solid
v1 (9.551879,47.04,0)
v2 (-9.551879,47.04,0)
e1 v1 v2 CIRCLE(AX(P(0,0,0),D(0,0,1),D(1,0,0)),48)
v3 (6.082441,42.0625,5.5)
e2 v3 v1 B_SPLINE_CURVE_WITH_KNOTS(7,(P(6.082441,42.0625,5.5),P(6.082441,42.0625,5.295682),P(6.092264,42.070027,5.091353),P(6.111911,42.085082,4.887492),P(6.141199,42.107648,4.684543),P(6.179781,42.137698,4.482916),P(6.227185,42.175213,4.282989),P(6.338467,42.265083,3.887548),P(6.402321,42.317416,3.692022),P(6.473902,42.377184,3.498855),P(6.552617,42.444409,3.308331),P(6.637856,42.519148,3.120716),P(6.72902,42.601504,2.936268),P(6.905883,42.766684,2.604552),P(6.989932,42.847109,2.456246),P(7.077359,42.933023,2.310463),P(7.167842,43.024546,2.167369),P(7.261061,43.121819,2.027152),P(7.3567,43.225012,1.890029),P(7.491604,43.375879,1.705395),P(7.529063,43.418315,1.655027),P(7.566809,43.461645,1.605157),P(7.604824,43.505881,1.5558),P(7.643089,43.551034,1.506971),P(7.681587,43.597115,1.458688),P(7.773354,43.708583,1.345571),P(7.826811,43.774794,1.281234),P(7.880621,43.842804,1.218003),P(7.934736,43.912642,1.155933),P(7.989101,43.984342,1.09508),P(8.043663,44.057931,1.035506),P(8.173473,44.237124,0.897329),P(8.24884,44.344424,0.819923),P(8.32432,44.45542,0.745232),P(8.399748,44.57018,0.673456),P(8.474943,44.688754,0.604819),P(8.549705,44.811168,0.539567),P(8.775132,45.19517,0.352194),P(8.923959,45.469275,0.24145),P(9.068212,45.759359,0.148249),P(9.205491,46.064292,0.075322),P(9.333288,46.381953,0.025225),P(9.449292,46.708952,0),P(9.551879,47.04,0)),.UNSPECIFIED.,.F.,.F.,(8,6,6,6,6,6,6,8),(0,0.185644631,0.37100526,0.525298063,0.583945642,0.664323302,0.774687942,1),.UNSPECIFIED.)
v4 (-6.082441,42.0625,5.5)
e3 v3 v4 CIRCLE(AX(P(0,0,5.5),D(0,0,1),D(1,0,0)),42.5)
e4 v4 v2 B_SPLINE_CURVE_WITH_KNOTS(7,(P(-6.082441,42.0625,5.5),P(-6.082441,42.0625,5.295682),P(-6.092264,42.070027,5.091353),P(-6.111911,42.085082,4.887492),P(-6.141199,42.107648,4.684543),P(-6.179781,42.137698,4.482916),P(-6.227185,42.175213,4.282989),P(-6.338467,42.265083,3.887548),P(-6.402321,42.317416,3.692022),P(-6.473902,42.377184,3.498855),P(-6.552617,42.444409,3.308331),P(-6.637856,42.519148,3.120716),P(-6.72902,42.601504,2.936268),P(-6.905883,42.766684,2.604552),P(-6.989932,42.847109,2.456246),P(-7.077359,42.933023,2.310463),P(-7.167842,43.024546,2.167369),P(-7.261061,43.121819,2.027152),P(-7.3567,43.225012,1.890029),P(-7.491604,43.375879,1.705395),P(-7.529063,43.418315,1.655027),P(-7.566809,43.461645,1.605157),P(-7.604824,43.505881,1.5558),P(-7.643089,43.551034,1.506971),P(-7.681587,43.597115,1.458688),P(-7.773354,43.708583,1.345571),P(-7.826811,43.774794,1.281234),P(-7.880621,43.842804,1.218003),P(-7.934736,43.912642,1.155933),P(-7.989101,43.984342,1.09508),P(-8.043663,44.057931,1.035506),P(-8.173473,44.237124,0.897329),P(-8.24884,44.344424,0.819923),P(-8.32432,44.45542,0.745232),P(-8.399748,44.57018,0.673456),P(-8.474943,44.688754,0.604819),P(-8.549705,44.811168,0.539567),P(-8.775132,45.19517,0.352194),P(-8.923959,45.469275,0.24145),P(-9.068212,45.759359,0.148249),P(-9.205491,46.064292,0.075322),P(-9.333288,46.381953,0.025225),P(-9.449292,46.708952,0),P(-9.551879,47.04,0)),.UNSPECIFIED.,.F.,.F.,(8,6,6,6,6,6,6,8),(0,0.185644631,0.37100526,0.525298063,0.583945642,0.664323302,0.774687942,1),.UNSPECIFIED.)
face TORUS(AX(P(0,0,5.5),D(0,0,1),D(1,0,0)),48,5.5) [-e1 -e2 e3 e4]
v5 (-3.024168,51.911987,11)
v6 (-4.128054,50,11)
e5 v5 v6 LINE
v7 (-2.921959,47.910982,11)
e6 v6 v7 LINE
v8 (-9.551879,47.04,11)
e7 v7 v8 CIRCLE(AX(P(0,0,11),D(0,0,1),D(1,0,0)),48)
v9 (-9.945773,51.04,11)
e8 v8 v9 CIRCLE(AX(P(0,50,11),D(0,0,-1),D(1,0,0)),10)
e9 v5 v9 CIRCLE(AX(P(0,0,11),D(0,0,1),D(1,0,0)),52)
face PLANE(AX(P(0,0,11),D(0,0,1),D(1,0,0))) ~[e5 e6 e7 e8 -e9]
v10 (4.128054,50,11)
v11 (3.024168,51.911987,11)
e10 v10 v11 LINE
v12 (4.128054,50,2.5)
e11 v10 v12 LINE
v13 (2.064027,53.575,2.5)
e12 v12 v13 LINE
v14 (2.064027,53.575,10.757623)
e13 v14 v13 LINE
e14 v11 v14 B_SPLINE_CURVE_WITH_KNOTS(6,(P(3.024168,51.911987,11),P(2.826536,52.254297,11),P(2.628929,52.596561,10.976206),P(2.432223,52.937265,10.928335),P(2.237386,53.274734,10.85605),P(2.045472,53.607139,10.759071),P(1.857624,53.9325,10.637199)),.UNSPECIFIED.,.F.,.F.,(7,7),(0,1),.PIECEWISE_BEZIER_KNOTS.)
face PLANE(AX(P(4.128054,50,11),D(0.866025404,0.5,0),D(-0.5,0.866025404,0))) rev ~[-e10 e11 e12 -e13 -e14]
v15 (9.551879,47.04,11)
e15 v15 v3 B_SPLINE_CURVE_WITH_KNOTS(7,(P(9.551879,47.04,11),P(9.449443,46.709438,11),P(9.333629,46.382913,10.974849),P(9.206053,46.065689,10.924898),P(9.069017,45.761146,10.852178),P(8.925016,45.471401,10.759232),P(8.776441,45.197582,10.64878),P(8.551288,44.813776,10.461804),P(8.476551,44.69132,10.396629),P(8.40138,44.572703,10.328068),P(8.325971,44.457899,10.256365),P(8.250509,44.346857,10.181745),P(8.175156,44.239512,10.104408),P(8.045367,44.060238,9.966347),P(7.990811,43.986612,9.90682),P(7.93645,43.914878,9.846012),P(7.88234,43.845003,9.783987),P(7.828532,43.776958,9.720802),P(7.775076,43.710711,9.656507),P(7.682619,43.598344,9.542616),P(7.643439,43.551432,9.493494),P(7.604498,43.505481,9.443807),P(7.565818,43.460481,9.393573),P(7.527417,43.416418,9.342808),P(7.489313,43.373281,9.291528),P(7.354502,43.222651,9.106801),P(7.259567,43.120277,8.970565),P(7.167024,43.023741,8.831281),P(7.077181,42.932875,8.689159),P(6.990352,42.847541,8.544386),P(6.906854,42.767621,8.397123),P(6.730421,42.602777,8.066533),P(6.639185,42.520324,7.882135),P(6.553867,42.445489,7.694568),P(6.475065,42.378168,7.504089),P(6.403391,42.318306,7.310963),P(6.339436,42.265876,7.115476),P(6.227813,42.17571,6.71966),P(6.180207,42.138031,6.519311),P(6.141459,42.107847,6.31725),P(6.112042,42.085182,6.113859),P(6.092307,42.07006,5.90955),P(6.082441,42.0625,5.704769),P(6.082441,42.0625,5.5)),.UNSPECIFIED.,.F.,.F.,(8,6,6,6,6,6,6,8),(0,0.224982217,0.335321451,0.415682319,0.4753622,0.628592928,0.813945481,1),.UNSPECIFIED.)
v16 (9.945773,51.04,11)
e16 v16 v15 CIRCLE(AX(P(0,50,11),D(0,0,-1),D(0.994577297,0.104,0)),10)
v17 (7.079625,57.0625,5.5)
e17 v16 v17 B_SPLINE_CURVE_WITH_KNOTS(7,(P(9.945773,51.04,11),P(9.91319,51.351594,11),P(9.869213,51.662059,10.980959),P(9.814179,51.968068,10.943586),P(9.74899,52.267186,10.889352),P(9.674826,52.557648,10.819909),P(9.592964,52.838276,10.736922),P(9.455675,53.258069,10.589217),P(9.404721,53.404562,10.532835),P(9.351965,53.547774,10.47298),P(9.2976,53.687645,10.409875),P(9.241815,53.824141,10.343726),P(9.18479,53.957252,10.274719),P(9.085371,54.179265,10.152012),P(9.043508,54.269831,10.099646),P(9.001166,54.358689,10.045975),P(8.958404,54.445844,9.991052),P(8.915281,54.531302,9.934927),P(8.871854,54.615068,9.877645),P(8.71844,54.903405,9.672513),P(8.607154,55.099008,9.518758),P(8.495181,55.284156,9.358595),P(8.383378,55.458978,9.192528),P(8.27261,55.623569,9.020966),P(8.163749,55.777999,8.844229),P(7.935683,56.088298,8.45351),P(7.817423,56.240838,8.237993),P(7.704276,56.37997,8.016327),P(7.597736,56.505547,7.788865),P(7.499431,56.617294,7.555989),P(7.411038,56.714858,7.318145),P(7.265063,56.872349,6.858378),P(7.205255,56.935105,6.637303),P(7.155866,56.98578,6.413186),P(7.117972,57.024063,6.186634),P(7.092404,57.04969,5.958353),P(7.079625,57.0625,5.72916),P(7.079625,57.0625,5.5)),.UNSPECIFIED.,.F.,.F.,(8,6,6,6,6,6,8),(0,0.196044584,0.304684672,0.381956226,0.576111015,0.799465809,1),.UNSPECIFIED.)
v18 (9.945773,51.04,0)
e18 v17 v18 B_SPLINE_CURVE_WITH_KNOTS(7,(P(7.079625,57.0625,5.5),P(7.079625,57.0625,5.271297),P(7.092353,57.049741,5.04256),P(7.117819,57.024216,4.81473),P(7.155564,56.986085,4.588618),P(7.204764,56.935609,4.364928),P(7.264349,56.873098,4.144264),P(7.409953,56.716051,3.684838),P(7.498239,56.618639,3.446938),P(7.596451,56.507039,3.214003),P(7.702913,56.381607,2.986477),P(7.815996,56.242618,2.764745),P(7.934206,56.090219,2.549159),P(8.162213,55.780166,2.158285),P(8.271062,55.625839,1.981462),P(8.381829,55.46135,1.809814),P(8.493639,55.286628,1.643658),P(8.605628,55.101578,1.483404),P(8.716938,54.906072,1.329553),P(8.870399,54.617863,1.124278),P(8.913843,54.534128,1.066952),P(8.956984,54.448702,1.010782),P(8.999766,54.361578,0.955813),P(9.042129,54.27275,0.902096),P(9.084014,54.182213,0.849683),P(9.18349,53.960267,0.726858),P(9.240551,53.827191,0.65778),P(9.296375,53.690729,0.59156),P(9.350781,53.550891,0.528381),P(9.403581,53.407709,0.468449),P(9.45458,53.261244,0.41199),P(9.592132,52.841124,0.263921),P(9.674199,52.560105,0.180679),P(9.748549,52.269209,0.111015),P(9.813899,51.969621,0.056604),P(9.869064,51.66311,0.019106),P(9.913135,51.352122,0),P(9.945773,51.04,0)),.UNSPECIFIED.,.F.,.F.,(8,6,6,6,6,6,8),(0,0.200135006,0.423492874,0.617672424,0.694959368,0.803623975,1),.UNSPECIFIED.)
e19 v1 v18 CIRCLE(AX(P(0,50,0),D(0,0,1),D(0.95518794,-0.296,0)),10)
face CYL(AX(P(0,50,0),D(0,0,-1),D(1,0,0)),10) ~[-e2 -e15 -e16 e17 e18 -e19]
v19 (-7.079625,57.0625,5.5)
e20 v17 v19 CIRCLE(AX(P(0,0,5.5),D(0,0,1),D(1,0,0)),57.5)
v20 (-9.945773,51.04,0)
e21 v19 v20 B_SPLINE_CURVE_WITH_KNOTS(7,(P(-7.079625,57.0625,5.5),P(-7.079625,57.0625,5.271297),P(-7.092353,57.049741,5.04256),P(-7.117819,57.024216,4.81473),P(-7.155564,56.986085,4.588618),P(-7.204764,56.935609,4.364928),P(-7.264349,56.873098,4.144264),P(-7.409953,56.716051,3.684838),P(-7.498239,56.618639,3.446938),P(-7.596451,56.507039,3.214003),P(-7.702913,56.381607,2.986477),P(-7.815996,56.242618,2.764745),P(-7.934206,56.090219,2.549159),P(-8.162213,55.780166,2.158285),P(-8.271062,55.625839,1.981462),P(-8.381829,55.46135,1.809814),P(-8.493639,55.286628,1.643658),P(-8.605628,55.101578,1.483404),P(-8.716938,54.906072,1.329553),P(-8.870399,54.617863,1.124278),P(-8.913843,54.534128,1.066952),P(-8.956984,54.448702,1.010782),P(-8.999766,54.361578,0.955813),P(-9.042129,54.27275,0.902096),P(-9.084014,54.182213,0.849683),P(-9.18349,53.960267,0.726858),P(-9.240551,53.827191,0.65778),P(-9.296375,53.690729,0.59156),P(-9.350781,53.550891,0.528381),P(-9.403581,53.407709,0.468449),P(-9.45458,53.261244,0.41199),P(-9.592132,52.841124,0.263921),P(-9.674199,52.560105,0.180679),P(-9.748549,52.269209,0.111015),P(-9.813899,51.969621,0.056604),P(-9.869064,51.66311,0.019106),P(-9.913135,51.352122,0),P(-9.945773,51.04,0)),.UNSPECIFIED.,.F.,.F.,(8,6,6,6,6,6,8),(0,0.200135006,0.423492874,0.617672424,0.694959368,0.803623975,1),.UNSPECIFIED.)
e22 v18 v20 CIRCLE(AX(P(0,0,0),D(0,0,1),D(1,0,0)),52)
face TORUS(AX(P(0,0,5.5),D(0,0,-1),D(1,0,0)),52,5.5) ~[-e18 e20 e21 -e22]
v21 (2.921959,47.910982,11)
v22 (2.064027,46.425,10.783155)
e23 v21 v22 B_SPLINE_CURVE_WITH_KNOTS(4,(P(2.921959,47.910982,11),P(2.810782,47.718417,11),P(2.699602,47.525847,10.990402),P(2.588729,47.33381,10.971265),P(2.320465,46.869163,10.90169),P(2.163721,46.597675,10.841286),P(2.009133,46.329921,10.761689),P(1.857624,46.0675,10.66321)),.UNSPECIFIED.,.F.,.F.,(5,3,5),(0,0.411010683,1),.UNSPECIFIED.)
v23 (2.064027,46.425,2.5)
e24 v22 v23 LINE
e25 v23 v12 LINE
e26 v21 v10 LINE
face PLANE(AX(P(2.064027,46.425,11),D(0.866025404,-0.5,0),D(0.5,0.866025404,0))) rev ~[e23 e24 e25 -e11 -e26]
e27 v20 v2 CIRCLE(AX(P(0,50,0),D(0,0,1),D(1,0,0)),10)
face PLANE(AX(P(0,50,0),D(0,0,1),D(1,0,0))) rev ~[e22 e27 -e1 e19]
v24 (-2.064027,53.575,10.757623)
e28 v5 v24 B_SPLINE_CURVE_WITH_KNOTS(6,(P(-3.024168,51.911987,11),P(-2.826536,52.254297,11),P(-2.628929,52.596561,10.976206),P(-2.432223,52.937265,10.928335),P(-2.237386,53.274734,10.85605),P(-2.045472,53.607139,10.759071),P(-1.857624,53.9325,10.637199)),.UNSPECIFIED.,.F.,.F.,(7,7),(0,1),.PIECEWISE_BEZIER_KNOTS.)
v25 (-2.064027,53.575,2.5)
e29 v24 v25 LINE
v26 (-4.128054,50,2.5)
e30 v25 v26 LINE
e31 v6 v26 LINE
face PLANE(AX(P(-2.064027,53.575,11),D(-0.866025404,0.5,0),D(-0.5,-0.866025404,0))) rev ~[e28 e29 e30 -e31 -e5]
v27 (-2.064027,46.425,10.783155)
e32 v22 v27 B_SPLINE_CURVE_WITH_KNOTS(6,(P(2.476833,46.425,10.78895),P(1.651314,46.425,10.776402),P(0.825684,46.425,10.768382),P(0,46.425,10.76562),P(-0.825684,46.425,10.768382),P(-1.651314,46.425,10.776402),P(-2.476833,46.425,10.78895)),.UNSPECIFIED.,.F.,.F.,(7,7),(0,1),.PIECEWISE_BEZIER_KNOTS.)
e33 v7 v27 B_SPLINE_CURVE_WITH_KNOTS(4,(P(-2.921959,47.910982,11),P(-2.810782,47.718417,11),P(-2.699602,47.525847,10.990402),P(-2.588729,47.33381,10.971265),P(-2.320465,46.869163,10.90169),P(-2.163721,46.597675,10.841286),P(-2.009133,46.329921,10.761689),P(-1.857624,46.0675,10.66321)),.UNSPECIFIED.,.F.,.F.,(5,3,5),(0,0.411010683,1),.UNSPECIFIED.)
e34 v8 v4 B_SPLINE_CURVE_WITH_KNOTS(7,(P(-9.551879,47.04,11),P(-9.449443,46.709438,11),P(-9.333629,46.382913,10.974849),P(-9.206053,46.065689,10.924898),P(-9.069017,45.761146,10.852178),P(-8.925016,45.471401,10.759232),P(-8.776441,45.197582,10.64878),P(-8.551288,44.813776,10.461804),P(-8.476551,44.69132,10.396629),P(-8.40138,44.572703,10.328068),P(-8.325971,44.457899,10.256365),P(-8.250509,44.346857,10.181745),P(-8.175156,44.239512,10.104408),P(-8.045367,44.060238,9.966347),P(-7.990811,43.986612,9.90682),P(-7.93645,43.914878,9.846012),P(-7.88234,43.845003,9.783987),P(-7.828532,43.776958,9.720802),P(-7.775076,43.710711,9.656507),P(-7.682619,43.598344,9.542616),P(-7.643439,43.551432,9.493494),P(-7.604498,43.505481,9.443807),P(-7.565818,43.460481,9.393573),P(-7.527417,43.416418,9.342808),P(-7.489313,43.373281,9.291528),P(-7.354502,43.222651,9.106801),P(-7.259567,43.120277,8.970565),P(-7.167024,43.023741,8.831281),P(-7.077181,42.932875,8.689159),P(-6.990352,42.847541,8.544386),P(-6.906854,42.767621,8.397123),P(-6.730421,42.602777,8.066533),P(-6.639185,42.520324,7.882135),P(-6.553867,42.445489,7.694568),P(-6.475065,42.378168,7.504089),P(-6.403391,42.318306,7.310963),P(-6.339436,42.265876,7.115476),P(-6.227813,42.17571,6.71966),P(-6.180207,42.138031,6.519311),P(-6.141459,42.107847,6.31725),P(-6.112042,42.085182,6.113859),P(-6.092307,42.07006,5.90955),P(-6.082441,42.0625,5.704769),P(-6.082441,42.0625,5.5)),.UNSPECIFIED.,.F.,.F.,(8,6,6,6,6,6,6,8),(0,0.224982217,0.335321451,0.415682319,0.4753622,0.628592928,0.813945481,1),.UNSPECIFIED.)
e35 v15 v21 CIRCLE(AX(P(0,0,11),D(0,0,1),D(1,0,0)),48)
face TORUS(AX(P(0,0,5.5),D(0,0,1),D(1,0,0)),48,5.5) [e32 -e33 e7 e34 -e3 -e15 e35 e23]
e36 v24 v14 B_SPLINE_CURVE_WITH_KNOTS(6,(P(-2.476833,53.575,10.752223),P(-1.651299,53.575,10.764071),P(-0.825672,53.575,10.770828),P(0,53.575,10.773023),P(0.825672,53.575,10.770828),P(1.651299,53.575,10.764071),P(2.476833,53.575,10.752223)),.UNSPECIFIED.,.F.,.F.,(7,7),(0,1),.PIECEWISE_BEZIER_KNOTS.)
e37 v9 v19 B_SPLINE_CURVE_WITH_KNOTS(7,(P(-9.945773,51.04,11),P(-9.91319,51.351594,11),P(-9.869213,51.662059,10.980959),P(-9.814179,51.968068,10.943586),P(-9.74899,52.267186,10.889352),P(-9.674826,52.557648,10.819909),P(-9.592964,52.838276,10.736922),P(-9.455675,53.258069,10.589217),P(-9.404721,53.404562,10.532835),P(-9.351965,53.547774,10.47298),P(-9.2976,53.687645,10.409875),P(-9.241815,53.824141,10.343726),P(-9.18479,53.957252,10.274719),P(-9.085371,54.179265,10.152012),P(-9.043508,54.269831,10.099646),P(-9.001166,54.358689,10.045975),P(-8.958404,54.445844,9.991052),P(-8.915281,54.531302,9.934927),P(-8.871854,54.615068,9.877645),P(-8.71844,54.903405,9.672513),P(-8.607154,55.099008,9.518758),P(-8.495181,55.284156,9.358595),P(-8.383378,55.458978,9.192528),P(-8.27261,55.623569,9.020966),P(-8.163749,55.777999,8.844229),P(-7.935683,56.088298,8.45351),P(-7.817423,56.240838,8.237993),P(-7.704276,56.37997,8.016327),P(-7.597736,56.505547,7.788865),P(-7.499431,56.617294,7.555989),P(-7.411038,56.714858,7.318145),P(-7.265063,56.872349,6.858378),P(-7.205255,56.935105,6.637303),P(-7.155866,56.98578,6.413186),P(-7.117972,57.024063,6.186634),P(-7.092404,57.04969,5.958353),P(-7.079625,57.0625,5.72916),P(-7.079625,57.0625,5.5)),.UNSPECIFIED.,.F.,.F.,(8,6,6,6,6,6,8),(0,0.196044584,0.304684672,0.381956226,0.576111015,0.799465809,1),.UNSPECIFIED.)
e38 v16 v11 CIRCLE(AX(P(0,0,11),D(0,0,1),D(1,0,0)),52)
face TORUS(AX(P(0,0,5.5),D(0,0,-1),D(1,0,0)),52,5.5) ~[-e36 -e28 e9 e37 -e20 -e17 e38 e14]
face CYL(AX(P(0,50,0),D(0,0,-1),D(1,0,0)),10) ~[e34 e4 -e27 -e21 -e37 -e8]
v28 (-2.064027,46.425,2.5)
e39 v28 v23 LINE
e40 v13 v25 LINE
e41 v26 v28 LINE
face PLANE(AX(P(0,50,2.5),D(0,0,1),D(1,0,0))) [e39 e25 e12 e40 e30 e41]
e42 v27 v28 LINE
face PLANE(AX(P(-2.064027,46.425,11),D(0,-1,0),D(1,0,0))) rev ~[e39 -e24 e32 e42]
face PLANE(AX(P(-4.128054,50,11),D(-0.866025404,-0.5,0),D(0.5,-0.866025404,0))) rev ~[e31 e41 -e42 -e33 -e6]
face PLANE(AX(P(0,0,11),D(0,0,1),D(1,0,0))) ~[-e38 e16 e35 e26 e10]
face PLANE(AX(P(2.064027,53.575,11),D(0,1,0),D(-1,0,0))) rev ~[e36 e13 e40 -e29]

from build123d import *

# Parameters (mm, degrees)
F0_W     = 15
F0_H     = 11
F3_DEPTH = 8.5
F5_R     = 10
F6_DEPTH = 25


# Not quite as in the source:
# - a fillet or chamfer that OpenCascade refuses, or shapes differently, is made with other operations: its cross-section is extruded or revolved along the edge and cut away or added


with BuildPart() as f1:
    # F0 (on Front) → F1 (revolve)
    with BuildSketch(Plane.XZ):
        with Locations((50, 5.5)):
            Rectangle(F0_W, F0_H)
    revolve(axis=Axis((0, 0, 11.3872010261), (0, 0, 1)))

    # F2 (on face) → F3 (cut)
    with BuildSketch(Plane.XY.offset(11)):
        Polygon((-2.0640272124, 46.425), (2.0640272124, 46.425), (4.1280544247, 50), (2.0640272124, 53.575), (-2.0640272124, 53.575), (-4.1280544247, 50), align=None)
        Polygon((-15.8591658515, 43.680976315), (-15.3203466262, 47.7737146618), (-18.5953523929, 50.2867149724), (-22.409177385, 48.7069769362), (-22.9479966103, 44.6142385893), (-19.6729908436, 42.1012382787), align=None)
        Polygon((-31.3679446782, 34.286919955), (-32.4363637825, 38.2743143361), (-36.4237581637, 39.3427334405), (-39.3427334405, 36.4237581637), (-38.2743143361, 32.4363637825), (-34.286919955, 31.3679446782), align=None)
        Polygon((-42.1012382787, 19.6729908436), (-44.6142385893, 22.9479966103), (-48.7069769362, 22.409177385), (-50.2867149724, 18.5953523929), (-47.7737146618, 15.3203466262), (-43.680976315, 15.8591658515), align=None)
        Polygon((-46.425, 2.0640272124), (-50, 4.1280544247), (-53.575, 2.0640272124), (-53.575, -2.0640272124), (-50, -4.1280544247), (-46.425, -2.0640272124), align=None)
        Polygon((-43.680976315, -15.8591658515), (-47.7737146618, -15.3203466262), (-50.2867149724, -18.5953523929), (-48.7069769362, -22.409177385), (-44.6142385893, -22.9479966103), (-42.1012382787, -19.6729908436), align=None)
        Polygon((-34.286919955, -31.3679446782), (-38.2743143361, -32.4363637825), (-39.3427334405, -36.4237581637), (-36.4237581637, -39.3427334405), (-32.4363637825, -38.2743143361), (-31.3679446782, -34.286919955), align=None)
        Polygon((-19.6729908436, -42.1012382787), (-22.9479966103, -44.6142385893), (-22.409177385, -48.7069769362), (-18.5953523929, -50.2867149724), (-15.3203466262, -47.7737146618), (-15.8591658515, -43.680976315), align=None)
        Polygon((-2.0640272124, -46.425), (-4.1280544247, -50), (-2.0640272124, -53.575), (2.0640272124, -53.575), (4.1280544247, -50), (2.0640272124, -46.425), align=None)
        Polygon((15.8591658515, -43.680976315), (15.3203466262, -47.7737146618), (18.5953523929, -50.2867149724), (22.409177385, -48.7069769362), (22.9479966103, -44.6142385893), (19.6729908436, -42.1012382787), align=None)
        Polygon((31.3679446782, -34.286919955), (32.4363637825, -38.2743143361), (36.4237581637, -39.3427334405), (39.3427334405, -36.4237581637), (38.2743143361, -32.4363637825), (34.286919955, -31.3679446782), align=None)
        Polygon((42.1012382787, -19.6729908436), (44.6142385893, -22.9479966103), (48.7069769362, -22.409177385), (50.2867149724, -18.5953523929), (47.7737146618, -15.3203466262), (43.680976315, -15.8591658515), align=None)
        Polygon((46.425, -2.0640272124), (50, -4.1280544247), (53.575, -2.0640272124), (53.575, 2.0640272124), (50, 4.1280544247), (46.425, 2.0640272124), align=None)
        Polygon((43.680976315, 15.8591658515), (47.7737146618, 15.3203466262), (50.2867149724, 18.5953523929), (48.7069769362, 22.409177385), (44.6142385893, 22.9479966103), (42.1012382787, 19.6729908436), align=None)
        Polygon((34.286919955, 31.3679446782), (38.2743143361, 32.4363637825), (39.3427334405, 36.4237581637), (36.4237581637, 39.3427334405), (32.4363637825, 38.2743143361), (31.3679446782, 34.286919955), align=None)
        Polygon((19.6729908436, 42.1012382787), (22.9479966103, 44.6142385893), (22.409177385, 48.7069769362), (18.5953523929, 50.2867149724), (15.3203466262, 47.7737146618), (15.8591658515, 43.680976315), align=None)
    extrude(amount=-F3_DEPTH, mode=Mode.SUBTRACT)

    # F4: fillet of radius 5.5 on 4 edges, made by hand

    # F4_s1 → F4_t2 (revolve, cut)
    with BuildSketch(Plane.XZ):
        with BuildLine():
            ThreePointArc((48, 11), (44.1109127035, 9.3890872965), (42.5, 5.5))
            Line((42.5, 5.5), (42.5, 11))
            Line((42.5, 11), (48, 11))
        make_face()
    revolve(axis=Axis((0, 0, 11), (0, 0, 1)), mode=Mode.SUBTRACT)

    # F4_s3 → F4_t4 (revolve, cut)
    with BuildSketch(Plane.XZ):
        with BuildLine():
            ThreePointArc((52, 11), (55.8890872965, 9.3890872965), (57.5, 5.5))
            Line((57.5, 5.5), (57.5, 11))
            Line((57.5, 11), (52, 11))
        make_face()
    revolve(axis=Axis((0, 0, 11), (0, 0, 1)), mode=Mode.SUBTRACT)

    # F4_s5 → F4_t6 (revolve, cut)
    with BuildSketch(Plane.XZ):
        with BuildLine():
            ThreePointArc((57.5, 5.5), (55.8890872965, 1.6109127035), (52, 0))
            Line((52, 0), (57.5, 0))
            Line((57.5, 0), (57.5, 5.5))
        make_face()
    revolve(axis=Axis((0, 0, 0), (0, 0, 1)), mode=Mode.SUBTRACT)

    # F4_s7 → F4_t8 (revolve, cut)
    with BuildSketch(Plane.XZ):
        with BuildLine():
            ThreePointArc((42.5, 5.5), (44.1109127035, 1.6109127035), (48, 0))
            Line((48, 0), (42.5, 0))
            Line((42.5, 0), (42.5, 5.5))
        make_face()
    revolve(axis=Axis((0, 0, 0), (0, 0, 1)), mode=Mode.SUBTRACT)


with BuildPart() as f6:
    # F5 (on Top) → F6 (new body)
    with BuildSketch(Plane.XY):
        with Locations((0, 50)):
            Circle(F5_R)
    extrude(amount=F6_DEPTH)

    # F7: intersect F1
    add(f1.part, mode=Mode.INTERSECT)


solid = f6.part
